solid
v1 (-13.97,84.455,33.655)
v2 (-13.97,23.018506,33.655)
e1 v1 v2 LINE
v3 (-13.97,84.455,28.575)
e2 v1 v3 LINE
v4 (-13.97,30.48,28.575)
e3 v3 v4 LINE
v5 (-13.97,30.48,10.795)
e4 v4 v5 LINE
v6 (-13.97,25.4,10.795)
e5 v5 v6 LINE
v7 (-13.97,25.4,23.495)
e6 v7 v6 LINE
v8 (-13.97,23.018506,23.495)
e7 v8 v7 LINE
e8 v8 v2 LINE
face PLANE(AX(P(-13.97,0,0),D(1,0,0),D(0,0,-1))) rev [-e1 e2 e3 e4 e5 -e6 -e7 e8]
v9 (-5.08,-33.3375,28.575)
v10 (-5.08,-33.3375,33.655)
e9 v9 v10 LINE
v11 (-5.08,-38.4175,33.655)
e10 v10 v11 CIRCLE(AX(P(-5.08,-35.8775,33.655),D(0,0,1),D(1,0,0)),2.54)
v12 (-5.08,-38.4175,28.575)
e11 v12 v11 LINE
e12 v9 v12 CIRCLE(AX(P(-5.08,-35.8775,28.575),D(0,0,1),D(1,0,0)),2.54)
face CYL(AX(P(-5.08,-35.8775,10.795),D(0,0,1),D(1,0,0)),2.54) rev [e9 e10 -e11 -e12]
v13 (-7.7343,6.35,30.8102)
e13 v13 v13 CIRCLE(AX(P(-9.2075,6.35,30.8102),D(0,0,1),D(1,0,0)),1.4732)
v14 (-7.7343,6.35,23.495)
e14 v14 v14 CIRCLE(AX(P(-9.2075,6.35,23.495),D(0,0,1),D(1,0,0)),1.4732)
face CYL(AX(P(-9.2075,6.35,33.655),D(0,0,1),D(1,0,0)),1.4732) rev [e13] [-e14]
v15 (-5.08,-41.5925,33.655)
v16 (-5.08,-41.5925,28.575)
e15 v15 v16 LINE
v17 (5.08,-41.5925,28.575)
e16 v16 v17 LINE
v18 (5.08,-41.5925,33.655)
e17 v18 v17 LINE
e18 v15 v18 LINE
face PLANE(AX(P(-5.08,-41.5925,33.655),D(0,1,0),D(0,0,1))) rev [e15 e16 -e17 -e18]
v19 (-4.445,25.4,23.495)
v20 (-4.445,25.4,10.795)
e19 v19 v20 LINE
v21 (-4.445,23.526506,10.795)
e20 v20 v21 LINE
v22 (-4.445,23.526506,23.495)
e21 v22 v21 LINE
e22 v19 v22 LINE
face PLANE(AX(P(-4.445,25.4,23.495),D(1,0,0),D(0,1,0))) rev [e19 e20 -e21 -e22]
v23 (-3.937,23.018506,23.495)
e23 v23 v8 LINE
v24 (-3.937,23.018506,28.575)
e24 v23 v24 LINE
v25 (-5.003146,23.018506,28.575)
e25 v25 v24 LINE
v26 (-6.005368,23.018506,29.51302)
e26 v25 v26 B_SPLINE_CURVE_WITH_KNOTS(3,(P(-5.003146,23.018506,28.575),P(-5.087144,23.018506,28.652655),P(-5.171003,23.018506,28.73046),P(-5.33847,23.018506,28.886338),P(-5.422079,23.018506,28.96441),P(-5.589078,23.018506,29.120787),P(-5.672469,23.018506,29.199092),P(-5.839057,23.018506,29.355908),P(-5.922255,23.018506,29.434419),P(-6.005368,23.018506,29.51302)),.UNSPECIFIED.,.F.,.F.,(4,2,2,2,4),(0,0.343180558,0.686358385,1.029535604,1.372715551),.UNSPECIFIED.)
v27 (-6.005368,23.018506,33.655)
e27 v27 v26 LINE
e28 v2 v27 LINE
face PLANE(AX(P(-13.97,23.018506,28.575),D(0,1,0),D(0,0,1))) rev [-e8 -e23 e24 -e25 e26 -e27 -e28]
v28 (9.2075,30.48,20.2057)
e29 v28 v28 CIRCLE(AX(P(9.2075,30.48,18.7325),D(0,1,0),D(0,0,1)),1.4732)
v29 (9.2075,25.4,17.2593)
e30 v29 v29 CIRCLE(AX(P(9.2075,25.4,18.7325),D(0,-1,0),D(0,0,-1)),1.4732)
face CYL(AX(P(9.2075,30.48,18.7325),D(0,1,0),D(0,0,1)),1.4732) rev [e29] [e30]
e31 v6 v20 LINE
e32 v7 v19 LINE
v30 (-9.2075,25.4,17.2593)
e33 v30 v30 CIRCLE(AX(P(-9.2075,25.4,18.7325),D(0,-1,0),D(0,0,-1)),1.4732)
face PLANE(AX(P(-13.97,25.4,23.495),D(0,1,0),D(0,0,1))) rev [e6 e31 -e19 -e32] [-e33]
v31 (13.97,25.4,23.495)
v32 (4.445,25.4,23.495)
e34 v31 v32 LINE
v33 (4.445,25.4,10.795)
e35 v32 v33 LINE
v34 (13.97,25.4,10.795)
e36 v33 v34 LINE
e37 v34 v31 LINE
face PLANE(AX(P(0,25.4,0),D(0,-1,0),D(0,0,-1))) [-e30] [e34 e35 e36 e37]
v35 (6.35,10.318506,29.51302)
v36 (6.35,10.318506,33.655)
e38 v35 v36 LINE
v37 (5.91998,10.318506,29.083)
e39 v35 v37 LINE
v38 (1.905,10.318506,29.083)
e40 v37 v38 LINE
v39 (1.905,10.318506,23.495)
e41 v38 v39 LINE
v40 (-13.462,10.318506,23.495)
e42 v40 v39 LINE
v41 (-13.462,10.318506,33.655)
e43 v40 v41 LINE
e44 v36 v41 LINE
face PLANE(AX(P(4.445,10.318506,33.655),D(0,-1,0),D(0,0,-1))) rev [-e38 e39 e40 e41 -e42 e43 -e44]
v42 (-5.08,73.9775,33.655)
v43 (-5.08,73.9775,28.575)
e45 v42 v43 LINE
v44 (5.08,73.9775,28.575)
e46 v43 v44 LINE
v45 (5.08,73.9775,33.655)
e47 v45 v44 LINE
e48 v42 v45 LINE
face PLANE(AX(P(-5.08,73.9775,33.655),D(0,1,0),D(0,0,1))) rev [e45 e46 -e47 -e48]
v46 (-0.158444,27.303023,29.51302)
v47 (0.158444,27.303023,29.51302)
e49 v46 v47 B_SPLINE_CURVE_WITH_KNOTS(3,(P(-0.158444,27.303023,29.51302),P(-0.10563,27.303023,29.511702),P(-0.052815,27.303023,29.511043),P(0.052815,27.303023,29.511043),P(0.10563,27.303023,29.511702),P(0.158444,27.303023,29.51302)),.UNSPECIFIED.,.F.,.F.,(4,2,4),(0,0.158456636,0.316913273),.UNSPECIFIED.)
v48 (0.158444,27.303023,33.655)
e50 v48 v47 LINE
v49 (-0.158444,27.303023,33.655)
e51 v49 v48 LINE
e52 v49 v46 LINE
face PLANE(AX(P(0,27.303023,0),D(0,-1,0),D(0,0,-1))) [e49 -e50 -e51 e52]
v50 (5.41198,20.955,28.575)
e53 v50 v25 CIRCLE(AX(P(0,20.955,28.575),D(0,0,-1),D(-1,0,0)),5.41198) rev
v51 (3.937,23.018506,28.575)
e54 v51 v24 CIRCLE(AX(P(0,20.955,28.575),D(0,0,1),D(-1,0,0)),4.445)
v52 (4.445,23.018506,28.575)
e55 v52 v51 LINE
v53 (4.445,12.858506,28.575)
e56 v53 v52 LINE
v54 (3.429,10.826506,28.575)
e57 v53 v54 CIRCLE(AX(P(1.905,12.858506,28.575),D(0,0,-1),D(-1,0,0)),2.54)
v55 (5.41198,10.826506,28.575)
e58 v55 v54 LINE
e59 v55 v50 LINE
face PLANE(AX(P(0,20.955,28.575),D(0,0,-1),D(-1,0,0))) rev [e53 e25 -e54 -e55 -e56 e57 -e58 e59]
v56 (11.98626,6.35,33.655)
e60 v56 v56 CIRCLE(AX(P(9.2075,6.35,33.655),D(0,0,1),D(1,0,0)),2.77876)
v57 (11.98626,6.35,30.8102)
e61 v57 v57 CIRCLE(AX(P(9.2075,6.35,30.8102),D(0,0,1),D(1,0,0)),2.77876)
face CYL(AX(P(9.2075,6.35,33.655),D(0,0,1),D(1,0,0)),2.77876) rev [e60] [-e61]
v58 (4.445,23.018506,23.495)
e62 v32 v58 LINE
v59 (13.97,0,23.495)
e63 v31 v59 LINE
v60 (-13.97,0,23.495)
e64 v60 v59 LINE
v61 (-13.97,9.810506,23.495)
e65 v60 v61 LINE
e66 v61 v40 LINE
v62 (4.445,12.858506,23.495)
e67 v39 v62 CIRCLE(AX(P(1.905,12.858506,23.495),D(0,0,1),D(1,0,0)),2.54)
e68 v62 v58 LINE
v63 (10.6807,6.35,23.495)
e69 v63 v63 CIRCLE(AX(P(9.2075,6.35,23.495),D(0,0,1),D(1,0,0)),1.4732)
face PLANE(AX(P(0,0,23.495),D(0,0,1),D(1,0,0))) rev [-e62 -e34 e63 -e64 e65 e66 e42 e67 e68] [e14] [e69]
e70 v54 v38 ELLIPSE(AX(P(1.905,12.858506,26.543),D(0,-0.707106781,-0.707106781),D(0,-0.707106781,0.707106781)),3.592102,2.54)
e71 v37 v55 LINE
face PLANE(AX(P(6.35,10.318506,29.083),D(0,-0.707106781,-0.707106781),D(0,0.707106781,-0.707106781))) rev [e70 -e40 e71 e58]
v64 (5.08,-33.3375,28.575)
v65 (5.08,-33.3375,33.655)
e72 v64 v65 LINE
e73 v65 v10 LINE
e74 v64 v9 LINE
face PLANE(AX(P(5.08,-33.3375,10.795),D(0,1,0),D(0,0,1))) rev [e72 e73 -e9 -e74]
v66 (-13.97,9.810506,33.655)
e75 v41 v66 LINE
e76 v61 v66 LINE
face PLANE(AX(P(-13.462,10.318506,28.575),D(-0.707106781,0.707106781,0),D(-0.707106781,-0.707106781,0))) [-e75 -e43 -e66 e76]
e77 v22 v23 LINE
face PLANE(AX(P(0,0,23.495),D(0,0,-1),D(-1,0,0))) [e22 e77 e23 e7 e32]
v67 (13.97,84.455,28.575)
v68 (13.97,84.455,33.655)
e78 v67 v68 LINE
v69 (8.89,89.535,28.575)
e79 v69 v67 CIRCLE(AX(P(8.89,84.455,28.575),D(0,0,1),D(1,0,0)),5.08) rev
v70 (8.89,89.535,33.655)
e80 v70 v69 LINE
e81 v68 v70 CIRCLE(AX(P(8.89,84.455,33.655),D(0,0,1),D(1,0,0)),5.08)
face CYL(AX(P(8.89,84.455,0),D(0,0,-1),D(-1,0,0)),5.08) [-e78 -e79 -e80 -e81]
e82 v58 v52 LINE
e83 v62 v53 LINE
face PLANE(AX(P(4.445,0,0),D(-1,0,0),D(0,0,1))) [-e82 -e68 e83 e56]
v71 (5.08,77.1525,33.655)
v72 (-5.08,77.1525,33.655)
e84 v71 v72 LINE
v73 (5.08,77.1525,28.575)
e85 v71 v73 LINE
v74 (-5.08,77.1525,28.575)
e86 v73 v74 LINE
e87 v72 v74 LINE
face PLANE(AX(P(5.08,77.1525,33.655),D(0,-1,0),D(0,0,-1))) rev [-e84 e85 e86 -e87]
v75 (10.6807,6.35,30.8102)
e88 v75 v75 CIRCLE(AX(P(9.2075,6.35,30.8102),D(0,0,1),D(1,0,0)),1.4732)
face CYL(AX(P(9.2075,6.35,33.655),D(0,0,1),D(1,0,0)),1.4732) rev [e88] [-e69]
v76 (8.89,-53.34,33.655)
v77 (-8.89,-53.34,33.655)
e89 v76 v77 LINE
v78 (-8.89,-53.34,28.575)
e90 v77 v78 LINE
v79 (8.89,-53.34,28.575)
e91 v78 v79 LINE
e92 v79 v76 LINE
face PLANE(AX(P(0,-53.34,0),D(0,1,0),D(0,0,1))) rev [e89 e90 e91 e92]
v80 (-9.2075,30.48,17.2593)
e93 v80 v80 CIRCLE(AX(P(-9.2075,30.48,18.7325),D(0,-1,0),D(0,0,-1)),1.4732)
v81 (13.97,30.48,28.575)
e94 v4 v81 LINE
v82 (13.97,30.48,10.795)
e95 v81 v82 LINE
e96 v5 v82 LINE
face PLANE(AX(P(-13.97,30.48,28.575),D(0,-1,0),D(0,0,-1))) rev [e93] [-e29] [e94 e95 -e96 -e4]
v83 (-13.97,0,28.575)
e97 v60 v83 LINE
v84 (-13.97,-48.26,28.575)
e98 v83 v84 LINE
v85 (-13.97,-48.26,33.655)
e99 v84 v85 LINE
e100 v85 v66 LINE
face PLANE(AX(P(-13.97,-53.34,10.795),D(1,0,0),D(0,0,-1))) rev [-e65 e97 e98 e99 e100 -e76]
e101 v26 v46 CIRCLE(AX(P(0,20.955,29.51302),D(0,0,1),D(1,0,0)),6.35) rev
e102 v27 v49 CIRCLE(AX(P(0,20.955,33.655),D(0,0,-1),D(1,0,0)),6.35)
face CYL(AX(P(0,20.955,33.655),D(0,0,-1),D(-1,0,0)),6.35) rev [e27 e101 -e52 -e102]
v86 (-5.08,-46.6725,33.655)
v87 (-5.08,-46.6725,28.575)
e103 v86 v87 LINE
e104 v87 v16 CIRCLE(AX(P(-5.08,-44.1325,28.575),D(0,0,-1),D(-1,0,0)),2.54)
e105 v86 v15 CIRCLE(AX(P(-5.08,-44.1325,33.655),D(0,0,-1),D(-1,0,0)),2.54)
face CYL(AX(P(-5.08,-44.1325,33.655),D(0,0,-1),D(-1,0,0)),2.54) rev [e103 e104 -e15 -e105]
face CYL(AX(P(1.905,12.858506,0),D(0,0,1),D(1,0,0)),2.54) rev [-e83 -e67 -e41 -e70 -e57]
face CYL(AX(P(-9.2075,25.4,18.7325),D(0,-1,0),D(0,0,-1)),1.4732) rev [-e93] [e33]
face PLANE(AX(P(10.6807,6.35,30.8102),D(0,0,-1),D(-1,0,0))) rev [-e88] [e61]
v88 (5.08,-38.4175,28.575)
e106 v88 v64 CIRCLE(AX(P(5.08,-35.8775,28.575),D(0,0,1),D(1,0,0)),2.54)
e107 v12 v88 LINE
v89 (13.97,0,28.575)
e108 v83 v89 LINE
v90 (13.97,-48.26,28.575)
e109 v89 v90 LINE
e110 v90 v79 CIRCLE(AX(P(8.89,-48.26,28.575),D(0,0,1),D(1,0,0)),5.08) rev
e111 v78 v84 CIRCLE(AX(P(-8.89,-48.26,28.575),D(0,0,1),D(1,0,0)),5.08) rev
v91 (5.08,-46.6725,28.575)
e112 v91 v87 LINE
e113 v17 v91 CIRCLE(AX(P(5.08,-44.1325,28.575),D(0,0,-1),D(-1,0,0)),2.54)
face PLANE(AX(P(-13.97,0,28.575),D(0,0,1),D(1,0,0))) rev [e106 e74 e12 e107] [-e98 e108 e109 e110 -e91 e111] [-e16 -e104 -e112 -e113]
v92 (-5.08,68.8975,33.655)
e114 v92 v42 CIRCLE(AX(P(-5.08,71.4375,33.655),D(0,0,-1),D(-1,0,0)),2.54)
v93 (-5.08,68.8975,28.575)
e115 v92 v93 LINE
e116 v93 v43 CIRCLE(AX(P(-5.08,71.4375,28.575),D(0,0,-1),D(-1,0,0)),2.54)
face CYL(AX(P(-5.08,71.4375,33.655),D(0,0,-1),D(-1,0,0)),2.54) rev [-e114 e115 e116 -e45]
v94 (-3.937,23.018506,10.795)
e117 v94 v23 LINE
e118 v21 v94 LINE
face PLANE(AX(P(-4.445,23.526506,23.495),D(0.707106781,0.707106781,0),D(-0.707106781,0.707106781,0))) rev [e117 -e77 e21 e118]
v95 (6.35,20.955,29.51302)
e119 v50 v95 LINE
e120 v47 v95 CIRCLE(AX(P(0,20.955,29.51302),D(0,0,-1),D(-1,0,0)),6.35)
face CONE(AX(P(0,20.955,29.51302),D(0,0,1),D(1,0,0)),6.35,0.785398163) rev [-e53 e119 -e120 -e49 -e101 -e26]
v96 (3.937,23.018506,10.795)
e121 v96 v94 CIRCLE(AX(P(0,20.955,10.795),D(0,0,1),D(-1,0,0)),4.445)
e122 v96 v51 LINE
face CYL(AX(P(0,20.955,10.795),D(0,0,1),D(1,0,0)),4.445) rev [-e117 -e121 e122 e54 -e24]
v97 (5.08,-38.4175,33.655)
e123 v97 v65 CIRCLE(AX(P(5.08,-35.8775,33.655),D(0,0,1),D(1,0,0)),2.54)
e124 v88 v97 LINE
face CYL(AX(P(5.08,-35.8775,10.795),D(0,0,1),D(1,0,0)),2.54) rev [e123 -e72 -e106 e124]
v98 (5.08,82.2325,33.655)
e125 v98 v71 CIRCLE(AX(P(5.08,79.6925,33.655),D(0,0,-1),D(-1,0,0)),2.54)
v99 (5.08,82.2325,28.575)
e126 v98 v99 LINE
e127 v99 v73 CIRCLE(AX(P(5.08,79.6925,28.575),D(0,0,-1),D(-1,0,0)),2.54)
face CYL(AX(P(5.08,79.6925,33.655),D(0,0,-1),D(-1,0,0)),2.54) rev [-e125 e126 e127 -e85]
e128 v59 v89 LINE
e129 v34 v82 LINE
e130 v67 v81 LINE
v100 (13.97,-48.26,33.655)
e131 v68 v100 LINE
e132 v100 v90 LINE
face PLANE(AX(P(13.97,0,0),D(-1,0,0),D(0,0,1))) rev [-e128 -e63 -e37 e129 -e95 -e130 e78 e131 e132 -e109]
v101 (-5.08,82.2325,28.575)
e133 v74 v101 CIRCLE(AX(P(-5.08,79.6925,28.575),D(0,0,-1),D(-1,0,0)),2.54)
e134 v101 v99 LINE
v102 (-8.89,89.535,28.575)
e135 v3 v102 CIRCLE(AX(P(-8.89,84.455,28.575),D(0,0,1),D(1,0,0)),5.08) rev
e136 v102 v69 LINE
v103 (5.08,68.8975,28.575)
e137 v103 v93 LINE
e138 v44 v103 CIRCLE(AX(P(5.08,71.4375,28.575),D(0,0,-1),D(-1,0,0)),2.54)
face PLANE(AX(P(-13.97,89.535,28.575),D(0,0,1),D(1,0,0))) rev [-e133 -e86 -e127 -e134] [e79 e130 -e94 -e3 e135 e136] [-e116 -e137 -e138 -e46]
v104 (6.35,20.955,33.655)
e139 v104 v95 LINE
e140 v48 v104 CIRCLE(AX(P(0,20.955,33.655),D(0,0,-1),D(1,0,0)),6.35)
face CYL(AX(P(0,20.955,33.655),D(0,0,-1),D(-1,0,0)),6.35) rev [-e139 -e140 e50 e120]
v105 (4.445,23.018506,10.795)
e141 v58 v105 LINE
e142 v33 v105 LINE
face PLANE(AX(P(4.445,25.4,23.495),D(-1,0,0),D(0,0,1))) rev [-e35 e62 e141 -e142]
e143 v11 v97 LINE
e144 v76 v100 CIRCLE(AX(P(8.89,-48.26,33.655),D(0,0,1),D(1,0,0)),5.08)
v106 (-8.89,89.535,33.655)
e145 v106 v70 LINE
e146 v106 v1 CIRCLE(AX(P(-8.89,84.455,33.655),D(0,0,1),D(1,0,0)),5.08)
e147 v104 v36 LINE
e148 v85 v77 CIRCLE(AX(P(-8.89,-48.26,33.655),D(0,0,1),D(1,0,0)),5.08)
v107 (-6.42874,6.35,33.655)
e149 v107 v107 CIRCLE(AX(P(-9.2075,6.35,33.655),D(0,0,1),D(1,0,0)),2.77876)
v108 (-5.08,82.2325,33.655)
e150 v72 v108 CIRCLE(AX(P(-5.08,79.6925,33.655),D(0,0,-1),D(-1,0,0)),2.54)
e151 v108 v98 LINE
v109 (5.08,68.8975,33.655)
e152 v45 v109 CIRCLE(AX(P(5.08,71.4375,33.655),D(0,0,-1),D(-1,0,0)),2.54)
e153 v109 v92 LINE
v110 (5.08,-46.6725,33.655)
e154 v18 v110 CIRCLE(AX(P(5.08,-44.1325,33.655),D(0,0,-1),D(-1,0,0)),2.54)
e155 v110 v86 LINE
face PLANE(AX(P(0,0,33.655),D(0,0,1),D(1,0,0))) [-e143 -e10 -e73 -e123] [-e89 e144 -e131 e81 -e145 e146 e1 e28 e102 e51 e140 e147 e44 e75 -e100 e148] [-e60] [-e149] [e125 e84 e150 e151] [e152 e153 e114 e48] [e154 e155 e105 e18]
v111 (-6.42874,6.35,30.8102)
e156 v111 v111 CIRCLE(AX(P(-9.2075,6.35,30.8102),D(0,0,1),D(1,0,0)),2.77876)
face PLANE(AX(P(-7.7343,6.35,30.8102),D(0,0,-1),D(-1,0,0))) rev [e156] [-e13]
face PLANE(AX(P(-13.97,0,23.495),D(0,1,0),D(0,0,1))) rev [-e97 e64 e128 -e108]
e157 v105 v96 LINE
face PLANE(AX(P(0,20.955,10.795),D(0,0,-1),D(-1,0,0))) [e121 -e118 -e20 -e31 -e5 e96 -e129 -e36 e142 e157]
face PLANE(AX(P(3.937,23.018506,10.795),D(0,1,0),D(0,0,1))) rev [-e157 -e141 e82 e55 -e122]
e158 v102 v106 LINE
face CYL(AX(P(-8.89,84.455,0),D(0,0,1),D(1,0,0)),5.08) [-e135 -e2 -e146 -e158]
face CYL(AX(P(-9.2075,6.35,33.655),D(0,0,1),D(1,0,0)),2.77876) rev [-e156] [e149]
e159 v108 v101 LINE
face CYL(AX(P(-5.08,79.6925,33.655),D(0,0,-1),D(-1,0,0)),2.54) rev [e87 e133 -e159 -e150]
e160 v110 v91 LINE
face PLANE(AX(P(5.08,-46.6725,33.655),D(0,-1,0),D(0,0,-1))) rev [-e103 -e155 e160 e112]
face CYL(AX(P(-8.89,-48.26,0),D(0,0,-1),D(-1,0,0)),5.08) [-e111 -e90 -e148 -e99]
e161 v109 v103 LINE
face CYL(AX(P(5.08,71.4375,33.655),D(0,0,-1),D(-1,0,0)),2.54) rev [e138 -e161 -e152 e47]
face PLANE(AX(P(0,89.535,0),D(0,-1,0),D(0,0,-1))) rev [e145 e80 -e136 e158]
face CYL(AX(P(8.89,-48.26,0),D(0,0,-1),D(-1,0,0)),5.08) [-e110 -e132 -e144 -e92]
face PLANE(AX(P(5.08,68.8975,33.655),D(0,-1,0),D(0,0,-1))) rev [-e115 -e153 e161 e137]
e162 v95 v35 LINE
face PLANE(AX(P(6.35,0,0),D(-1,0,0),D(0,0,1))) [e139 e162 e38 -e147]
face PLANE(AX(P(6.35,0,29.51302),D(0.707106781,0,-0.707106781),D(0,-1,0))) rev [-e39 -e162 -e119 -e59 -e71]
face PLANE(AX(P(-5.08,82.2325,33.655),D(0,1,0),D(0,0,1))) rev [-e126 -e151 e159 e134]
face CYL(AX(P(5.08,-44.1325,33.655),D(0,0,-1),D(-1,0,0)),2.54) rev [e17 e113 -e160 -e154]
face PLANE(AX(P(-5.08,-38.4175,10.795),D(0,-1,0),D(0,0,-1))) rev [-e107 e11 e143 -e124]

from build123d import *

# Parameters (mm, degrees)
BOSS_EXTRUDE1_DEPTH                                = 5.080000000000001
SKETCH2_W                                          = 5.079999999999998
SKETCH2_H                                          = 0.5079999999999831
BOSS_EXTRUDE2_DEPTH                                = 17.907000000000004
BOSS_EXTRUDE3_DEPTH                                = 1.9049999999999987
BOSS_EXTRUDE4_DEPTH                                = 17.779999999999998
SKETCH5_W                                          = 20.31999999999999
SKETCH5_H                                          = 22.859999999999992
BOSS_EXTRUDE5_DEPTH                                = 63.1505057547775
BOSS_EXTRUDE6_DEPTH                                = 10.03299999999999
BOSS_EXTRUDE7_DEPTH                                = 5.079999999999997
SKETCH8_W                                          = 22.859999999999992
SKETCH8_H                                          = 80.6430229523153
BOSS_EXTRUDE8_DEPTH                                = 7.619999999999997
CUT_EXTRUDE1_DEPTH                                 = 12.699999999999996
CUT_EXTRUDE2_DEPTH                                 = 12.699999999999998
BOSS_EXTRUDE9_DEPTH                                = 5.079999999999997
BOSS_EXTRUDE10_DEPTH                               = 62.23197704768469
SKETCH13_W                                         = 9.524999999999991
SKETCH13_H                                         = 12.699999999999998
CUT_EXTRUDE3_DEPTH                                 = 2.381494245222503
SKETCH14_W                                         = 17.779999999999994
SKETCH14_H                                         = 59.05499999999999
CUT_EXTRUDE4_DEPTH                                 = 100.64847640581364
SKETCH15_W                                         = 5.079999999999998
SKETCH15_H                                         = 53.339999999999996
CUT_EXTRUDE5_DEPTH                                 = 100.64847640581364
CUT_EXTRUDE6_DEPTH                                 = 93.34611808300336
CUT_EXTRUDE7_DEPTH                                 = 94.45724543875664
CUT_EXTRUDE8_DEPTH                                 = 93.34611808300336
CUT_EXTRUDE9_DEPTH                                 = 93.34611808300336
CBORE_FOR_M2_5_HEX_HEAD_MACHINE_SCREW1_D           = 2.9464
CBORE_FOR_M2_5_HEX_HEAD_MACHINE_SCREW1_DEPTH       = 22.86
CBORE_FOR_M2_5_HEX_HEAD_MACHINE_SCREW1_CBORE_D     = 5.55752
CBORE_FOR_M2_5_HEX_HEAD_MACHINE_SCREW1_CBORE_DEPTH = 2.8448
M2_5_CLEARANCE_HOLE1_D                             = 2.9464
M2_5_CLEARANCE_HOLE1_DEPTH                         = 83.82
M2_5_CLEARANCE_HOLE2_D                             = 2.9464
M2_5_CLEARANCE_HOLE2_DEPTH                         = 64.135
FILLET2_R                                          = 2.540000000000001
CHAMFER2_SIZE                                      = 0.938019803
FILLET3_R                                          = 5.079999999999999


with BuildPart() as part:
    # Sketch1 → Boss-Extrude1 (new body)
    with BuildSketch(Plane.XY.offset(33.654999999999994)):
        Polygon((-13.96999999999999, 9.810505754777516), (-13.461999999999998, 9.810505754777516), (-13.461999999999998, 10.3185057547775), align=None)
    extrude(amount=-BOSS_EXTRUDE1_DEPTH)

    # Sketch2 → Boss-Extrude2 (add)
    with BuildSketch(Plane(origin=(-13.461999999999998, 0, 0), x_dir=(0, 0, -1), z_dir=(1, 0, 0))):
        with Locations((-31.114999999999995, 10.064505754777507)):
            Rectangle(SKETCH2_W, SKETCH2_H)
    extrude(amount=BOSS_EXTRUDE2_DEPTH)

    # Sketch3 → Boss-Extrude3 (add)
    with BuildSketch(Plane(origin=(4.445000000000005, 0, 0), x_dir=(0, 0, -1), z_dir=(1, 0, 0))):
        Polygon((-28.574999999999996, 9.810505754777516), (-33.654999999999994, 9.810505754777516), (-33.654999999999994, 10.3185057547775), (-29.083000000000002, 10.3185057547775), (-28.574999999999996, 10.826505754777498), align=None)
    extrude(amount=BOSS_EXTRUDE3_DEPTH)

    # Sketch4 → Boss-Extrude4 (add)
    with BuildSketch(Plane(origin=(0, 0, 28.574999999999996), x_dir=(-1, 0, 0), z_dir=(0, 0, -1))):
        with BuildLine():
            Line((-6.3500000000000005, 9.810505754777516), (-6.349999999999998, 27.303022952315306))
            Line((-6.349999999999998, 27.303022952315306), (3.93700000000001, 27.303022952315306))
            Line((3.93700000000001, 27.303022952315306), (3.93700000000001, 23.0185057547775))
            ThreePointArc((3.93700000000001, 23.0185057547775), (-2.14e-15, 25.399999999999995), (-3.9370000000000167, 23.0185057547775))
            Line((-3.9370000000000167, 23.0185057547775), (-4.445000000000012, 23.0185057547775))
            Line((-4.445000000000012, 23.0185057547775), (-4.445000000000001, 10.3185057547775))
            Line((-4.445000000000001, 10.3185057547775), (13.46200000000004, 10.3185057547775))
            Line((13.46200000000004, 10.3185057547775), (13.969999999999992, 9.810505754777516))
            Line((13.969999999999992, 9.810505754777516), (-6.3500000000000005, 9.810505754777516))
        make_face()
    extrude(amount=BOSS_EXTRUDE4_DEPTH)

    # Sketch5 → Boss-Extrude5 (add)
    with BuildSketch(Plane.XZ.offset(-9.810505754777516)):
        with Locations((-3.8099999999999947, 22.224999999999998)):
            Rectangle(SKETCH5_W, SKETCH5_H)
    extrude(amount=BOSS_EXTRUDE5_DEPTH)

    # Sketch6 → Boss-Extrude6 (add)
    with BuildSketch(Plane.ZY.offset(3.93700000000001)):
        Polygon((28.575, 23.0185057547775), (10.795, 23.0185057547775), (10.794999999999998, 27.303022952315306), (28.575, 27.303022952315306), align=None)
    extrude(amount=BOSS_EXTRUDE6_DEPTH)

    # Sketch7 → Boss-Extrude7 (add)
    with BuildSketch(Plane.XY.offset(28.574999999999996)):
        with BuildLine():
            Line((0.15844430213195376, 27.303022952315306), (6.3500000000000005, 27.303022952315306))
            Line((6.3500000000000005, 27.303022952315306), (6.3500000000000005, 20.955000000000002))
            ThreePointArc((6.3500000000000005, 20.955000000000002), (4.545801432010527, 25.38875566994067), (0.15844430213195376, 27.303022952315306))
        make_face()
    extrude(amount=BOSS_EXTRUDE7_DEPTH)

    # Sketch8 → Boss-Extrude8 (add)
    with BuildSketch(Plane(origin=(6.350000000000003, 0, 0), x_dir=(0, 0, -1), z_dir=(1, 0, 0))):
        with Locations((-22.224999999999998, -13.018488523842345)):
            Rectangle(SKETCH8_W, SKETCH8_H)
    extrude(amount=BOSS_EXTRUDE8_DEPTH)

    # Sketch9 → Cut-Extrude1 (cut)
    with BuildSketch(Plane(origin=(0, 0, 10.794999999999998), x_dir=(-1, 0, 0), z_dir=(0, 0, -1))):
        Polygon((13.97, 25.4), (4.44500000000001, 25.4), (4.445000000000009, 23.526505754777506), (3.9369999999999985, 23.0185057547775), (13.97, 23.0185057547775), align=None)
    extrude(amount=-CUT_EXTRUDE1_DEPTH, mode=Mode.SUBTRACT)

    # Sketch10 → Cut-Extrude2 (cut)
    with BuildSketch(Plane(origin=(0, 0, 10.794999999999998), x_dir=(-1, 0, 0), z_dir=(0, 0, -1))):
        Polygon((-4.445000000000001, 10.3185057547775), (-4.44500000000001, 23.018505754777497), (-13.97, 23.018505754777497), (-13.97, -53.339999999999996), (13.969999999999992, -53.339999999999996), (13.970000000000004, 9.81050575477752), (13.46200000000004, 10.3185057547775), align=None)
    extrude(amount=-CUT_EXTRUDE2_DEPTH, mode=Mode.SUBTRACT)

    # Sketch11 → Boss-Extrude9 (add)
    with BuildSketch(Plane.XY.offset(28.574999999999996)):
        with BuildLine():
            Line((-6.005367932108752, 23.0185057547775), (-13.97, 23.0185057547775))
            Line((-13.97, 23.0185057547775), (-13.97, 27.303022952315306))
            Line((-13.97, 27.303022952315306), (-0.15844430213195376, 27.303022952315306))
            ThreePointArc((-0.15844430213195376, 27.303022952315306), (-3.7533208254481982, 26.077019404615417), (-6.005367932108752, 23.0185057547775))
        make_face()
    extrude(amount=BOSS_EXTRUDE9_DEPTH)

    # Sketch12 → Boss-Extrude10 (add)
    with BuildSketch(Plane(origin=(0, 27.303022952315306, 0), x_dir=(-1, 0, 0), z_dir=(0, 1, 0))):
        Polygon((-13.97, 33.654999999999994), (13.97, 33.654999999999994), (13.97, 10.794999999999998), (-13.97, 10.795), align=None)
    extrude(amount=BOSS_EXTRUDE10_DEPTH)

    # Sketch13 → Cut-Extrude3 (cut)
    with BuildSketch(Plane.XZ.offset(-23.0185057547775)):
        with Locations((9.207500000000005, 17.145)):
            Rectangle(SKETCH13_W, SKETCH13_H)
    extrude(amount=-CUT_EXTRUDE3_DEPTH, mode=Mode.SUBTRACT)

    # Sketch14 → Cut-Extrude4 (cut, through all)
    with BuildSketch(Plane(origin=(13.97, 0, 0), x_dir=(0, 0, -1), z_dir=(1, 0, 0))):
        with Locations((-19.685, 60.0075)):
            Rectangle(SKETCH14_W, SKETCH14_H)
    extrude(amount=-CUT_EXTRUDE4_DEPTH, mode=Mode.SUBTRACT)

    # Sketch15 → Cut-Extrude5 (cut, through all)
    with BuildSketch(Plane(origin=(13.97, 0, 0), x_dir=(0, 0, -1), z_dir=(1, 0, 0))):
        with Locations((-26.034999999999997, -26.669999999999998)):
            Rectangle(SKETCH15_W, SKETCH15_H)
    extrude(amount=-CUT_EXTRUDE5_DEPTH, mode=Mode.SUBTRACT)

    # Sketch16 → Cut-Extrude6 (cut, through all)
    with BuildSketch(Plane(origin=(0, 0, 28.575), x_dir=(-1, 0, 0), z_dir=(0, 0, -1))):
        with BuildLine():
            Line((5.08, -41.592499999999994), (-5.08, -41.592499999999994))
            ThreePointArc((-5.08, -41.592499999999994), (-7.620000000000006, -44.1325), (-5.08, -46.6725))
            Line((-5.08, -46.6725), (5.08, -46.6725))
            ThreePointArc((5.08, -46.6725), (7.619999999999999, -44.1325), (5.08, -41.592499999999994))
        make_face()
    extrude(amount=-CUT_EXTRUDE6_DEPTH, mode=Mode.SUBTRACT)

    # Sketch17 → Cut-Extrude7 (cut, through all)
    with BuildSketch(Plane.XY.offset(33.654999999999994)):
        with BuildLine():
            Line((-5.08, -38.4175), (5.08, -38.4175))
            ThreePointArc((5.08, -38.4175), (7.619999999999999, -35.8775), (5.08, -33.3375))
            Line((5.08, -33.3375), (-5.08, -33.3375))
            ThreePointArc((-5.08, -33.3375), (-7.619999999999999, -35.8775), (-5.08, -38.4175))
        make_face()
    extrude(amount=-CUT_EXTRUDE7_DEPTH, mode=Mode.SUBTRACT)

    # Sketch18 → Cut-Extrude8 (cut, through all)
    with BuildSketch(Plane(origin=(0, 0, 28.575), x_dir=(-1, 0, 0), z_dir=(0, 0, -1))):
        with BuildLine():
            Line((5.08, 73.9775), (-5.08, 73.9775))
            ThreePointArc((-5.08, 73.9775), (-7.620000000000006, 71.4375), (-5.08, 68.8975))
            Line((-5.08, 68.8975), (5.08, 68.8975))
            ThreePointArc((5.08, 68.8975), (7.620000000000006, 71.4375), (5.08, 73.9775))
        make_face()
    extrude(amount=-CUT_EXTRUDE8_DEPTH, mode=Mode.SUBTRACT)

    # Sketch19 → Cut-Extrude9 (cut, through all)
    with BuildSketch(Plane(origin=(0, 0, 28.575), x_dir=(-1, 0, 0), z_dir=(0, 0, -1))):
        with BuildLine():
            Line((5.08, 82.2325), (-5.08, 82.2325))
            ThreePointArc((-5.08, 82.2325), (-7.620000000000006, 79.6925), (-5.08, 77.1525))
            Line((-5.08, 77.1525), (5.08, 77.1525))
            ThreePointArc((5.08, 77.1525), (7.619999999999992, 79.6925), (5.08, 82.2325))
        make_face()
    extrude(amount=-CUT_EXTRUDE9_DEPTH, mode=Mode.SUBTRACT)

    # CBORE for M2.5 Hex Head Machine Screw1
    with Locations(Plane.XY.offset(33.654999999999994)):
        with Locations((9.2075, 6.35), (-9.2075, 6.35)):
            CounterBoreHole(CBORE_FOR_M2_5_HEX_HEAD_MACHINE_SCREW1_D / 2, CBORE_FOR_M2_5_HEX_HEAD_MACHINE_SCREW1_CBORE_D / 2, CBORE_FOR_M2_5_HEX_HEAD_MACHINE_SCREW1_CBORE_DEPTH, depth=CBORE_FOR_M2_5_HEX_HEAD_MACHINE_SCREW1_DEPTH)

    # M2.5 Clearance Hole1
    with Locations(Plane(origin=(0, 30.48, 0), x_dir=(1, 0, 0), z_dir=(0, 1, 0))):
        with Locations((9.2075, -18.7325)):
            Hole(M2_5_CLEARANCE_HOLE1_D / 2, depth=M2_5_CLEARANCE_HOLE1_DEPTH)

    # M2.5 Clearance Hole2
    with Locations(Plane(origin=(0, 25.4, 0), x_dir=(-1, 0, 0), z_dir=(0, -1, 0))):
        with Locations((9.2075, -18.7325)):
            Hole(M2_5_CLEARANCE_HOLE2_D / 2, depth=M2_5_CLEARANCE_HOLE2_DEPTH)

    # Fillet2
    fillet2_edges = [part.edges().sort_by_distance(p)[0] for p in [
        (4.445000000000004, 10.3185057547775, 26.289),
    ]]
    fillet(fillet2_edges, radius=FILLET2_R)

    # Chamfer2
    # the kernel refuses this chamfer: 0.938019803 mm, written as the material it adds along each edge
    with BuildSketch(Plane(origin=(3.44e-15, 20.955, 28.574999999999996), x_dir=(0.3476137543318691, 0.9376378180295966, 0), z_dir=(0.9376378180295966, -0.3476137543318691, 0))) as chamfer2_piece_1_section:
        Polygon((6.349999999999995 - CHAMFER2_SIZE, 0), (6.350000000000003, CHAMFER2_SIZE), (6.349999999999995, 0), align=None)
    chamfer2_piece_1 = revolve(axis=Axis((3.44e-15, 20.955, 28.574999999999996), (0, 0, 1)), revolution_arc=113.14940178409387, mode=Mode.PRIVATE)
    chamfer2_piece_1 = split(chamfer2_piece_1, bisect_by=Plane(origin=(-2.526546800118106, 23.0185057547775, 29.032255606191857), z_dir=(0, 1, 0)), keep=Keep.TOP, mode=Mode.PRIVATE)
    add(chamfer2_piece_1)
    with BuildSketch(Plane(origin=(6.350000000000003, 8.4142161862341, 28.574999999999996), x_dir=(0.027495876610586452, 0, 0.9996219169112966), z_dir=(-1.5e-16, 1, 0))) as chamfer2_piece_2:
        Polygon((CHAMFER2_SIZE * 0.999621916411, -CHAMFER2_SIZE * 0.0274958765968), (-CHAMFER2_SIZE * 0.0274958765968, -CHAMFER2_SIZE * 0.999621916411), (0, 0), align=None)
    extrude(amount=12.540783813765902)
    with BuildSketch(Plane(origin=(-2e-15, 20.955, 28.574999999999996), x_dir=(1, 5.6e-16, 0), z_dir=(5.6e-16, -1, 0))) as chamfer2_piece_3:
        Polygon((6.350000000000002 - CHAMFER2_SIZE, 0), (6.350000000000002, CHAMFER2_SIZE), (6.350000000000002, 0), align=None)
    revolve(axis=Axis((-2e-15, 20.955, 28.574999999999996), (0, 0, 1)), revolution_arc=110.34466934043498)

    # Fillet3
    fillet3_edges = [part.edges().sort_by_distance(p)[0] for p in [
        (13.97, -53.339999999999996, 31.114999999999995),
        (13.97, 89.535, 31.114999999999995),
        (-13.97, 89.535, 31.114999999999995),
        (-13.96999999999999, -53.33999999999998, 31.114999999999995),
    ]]
    fillet(fillet3_edges, radius=FILLET3_R)


solid = part.part
